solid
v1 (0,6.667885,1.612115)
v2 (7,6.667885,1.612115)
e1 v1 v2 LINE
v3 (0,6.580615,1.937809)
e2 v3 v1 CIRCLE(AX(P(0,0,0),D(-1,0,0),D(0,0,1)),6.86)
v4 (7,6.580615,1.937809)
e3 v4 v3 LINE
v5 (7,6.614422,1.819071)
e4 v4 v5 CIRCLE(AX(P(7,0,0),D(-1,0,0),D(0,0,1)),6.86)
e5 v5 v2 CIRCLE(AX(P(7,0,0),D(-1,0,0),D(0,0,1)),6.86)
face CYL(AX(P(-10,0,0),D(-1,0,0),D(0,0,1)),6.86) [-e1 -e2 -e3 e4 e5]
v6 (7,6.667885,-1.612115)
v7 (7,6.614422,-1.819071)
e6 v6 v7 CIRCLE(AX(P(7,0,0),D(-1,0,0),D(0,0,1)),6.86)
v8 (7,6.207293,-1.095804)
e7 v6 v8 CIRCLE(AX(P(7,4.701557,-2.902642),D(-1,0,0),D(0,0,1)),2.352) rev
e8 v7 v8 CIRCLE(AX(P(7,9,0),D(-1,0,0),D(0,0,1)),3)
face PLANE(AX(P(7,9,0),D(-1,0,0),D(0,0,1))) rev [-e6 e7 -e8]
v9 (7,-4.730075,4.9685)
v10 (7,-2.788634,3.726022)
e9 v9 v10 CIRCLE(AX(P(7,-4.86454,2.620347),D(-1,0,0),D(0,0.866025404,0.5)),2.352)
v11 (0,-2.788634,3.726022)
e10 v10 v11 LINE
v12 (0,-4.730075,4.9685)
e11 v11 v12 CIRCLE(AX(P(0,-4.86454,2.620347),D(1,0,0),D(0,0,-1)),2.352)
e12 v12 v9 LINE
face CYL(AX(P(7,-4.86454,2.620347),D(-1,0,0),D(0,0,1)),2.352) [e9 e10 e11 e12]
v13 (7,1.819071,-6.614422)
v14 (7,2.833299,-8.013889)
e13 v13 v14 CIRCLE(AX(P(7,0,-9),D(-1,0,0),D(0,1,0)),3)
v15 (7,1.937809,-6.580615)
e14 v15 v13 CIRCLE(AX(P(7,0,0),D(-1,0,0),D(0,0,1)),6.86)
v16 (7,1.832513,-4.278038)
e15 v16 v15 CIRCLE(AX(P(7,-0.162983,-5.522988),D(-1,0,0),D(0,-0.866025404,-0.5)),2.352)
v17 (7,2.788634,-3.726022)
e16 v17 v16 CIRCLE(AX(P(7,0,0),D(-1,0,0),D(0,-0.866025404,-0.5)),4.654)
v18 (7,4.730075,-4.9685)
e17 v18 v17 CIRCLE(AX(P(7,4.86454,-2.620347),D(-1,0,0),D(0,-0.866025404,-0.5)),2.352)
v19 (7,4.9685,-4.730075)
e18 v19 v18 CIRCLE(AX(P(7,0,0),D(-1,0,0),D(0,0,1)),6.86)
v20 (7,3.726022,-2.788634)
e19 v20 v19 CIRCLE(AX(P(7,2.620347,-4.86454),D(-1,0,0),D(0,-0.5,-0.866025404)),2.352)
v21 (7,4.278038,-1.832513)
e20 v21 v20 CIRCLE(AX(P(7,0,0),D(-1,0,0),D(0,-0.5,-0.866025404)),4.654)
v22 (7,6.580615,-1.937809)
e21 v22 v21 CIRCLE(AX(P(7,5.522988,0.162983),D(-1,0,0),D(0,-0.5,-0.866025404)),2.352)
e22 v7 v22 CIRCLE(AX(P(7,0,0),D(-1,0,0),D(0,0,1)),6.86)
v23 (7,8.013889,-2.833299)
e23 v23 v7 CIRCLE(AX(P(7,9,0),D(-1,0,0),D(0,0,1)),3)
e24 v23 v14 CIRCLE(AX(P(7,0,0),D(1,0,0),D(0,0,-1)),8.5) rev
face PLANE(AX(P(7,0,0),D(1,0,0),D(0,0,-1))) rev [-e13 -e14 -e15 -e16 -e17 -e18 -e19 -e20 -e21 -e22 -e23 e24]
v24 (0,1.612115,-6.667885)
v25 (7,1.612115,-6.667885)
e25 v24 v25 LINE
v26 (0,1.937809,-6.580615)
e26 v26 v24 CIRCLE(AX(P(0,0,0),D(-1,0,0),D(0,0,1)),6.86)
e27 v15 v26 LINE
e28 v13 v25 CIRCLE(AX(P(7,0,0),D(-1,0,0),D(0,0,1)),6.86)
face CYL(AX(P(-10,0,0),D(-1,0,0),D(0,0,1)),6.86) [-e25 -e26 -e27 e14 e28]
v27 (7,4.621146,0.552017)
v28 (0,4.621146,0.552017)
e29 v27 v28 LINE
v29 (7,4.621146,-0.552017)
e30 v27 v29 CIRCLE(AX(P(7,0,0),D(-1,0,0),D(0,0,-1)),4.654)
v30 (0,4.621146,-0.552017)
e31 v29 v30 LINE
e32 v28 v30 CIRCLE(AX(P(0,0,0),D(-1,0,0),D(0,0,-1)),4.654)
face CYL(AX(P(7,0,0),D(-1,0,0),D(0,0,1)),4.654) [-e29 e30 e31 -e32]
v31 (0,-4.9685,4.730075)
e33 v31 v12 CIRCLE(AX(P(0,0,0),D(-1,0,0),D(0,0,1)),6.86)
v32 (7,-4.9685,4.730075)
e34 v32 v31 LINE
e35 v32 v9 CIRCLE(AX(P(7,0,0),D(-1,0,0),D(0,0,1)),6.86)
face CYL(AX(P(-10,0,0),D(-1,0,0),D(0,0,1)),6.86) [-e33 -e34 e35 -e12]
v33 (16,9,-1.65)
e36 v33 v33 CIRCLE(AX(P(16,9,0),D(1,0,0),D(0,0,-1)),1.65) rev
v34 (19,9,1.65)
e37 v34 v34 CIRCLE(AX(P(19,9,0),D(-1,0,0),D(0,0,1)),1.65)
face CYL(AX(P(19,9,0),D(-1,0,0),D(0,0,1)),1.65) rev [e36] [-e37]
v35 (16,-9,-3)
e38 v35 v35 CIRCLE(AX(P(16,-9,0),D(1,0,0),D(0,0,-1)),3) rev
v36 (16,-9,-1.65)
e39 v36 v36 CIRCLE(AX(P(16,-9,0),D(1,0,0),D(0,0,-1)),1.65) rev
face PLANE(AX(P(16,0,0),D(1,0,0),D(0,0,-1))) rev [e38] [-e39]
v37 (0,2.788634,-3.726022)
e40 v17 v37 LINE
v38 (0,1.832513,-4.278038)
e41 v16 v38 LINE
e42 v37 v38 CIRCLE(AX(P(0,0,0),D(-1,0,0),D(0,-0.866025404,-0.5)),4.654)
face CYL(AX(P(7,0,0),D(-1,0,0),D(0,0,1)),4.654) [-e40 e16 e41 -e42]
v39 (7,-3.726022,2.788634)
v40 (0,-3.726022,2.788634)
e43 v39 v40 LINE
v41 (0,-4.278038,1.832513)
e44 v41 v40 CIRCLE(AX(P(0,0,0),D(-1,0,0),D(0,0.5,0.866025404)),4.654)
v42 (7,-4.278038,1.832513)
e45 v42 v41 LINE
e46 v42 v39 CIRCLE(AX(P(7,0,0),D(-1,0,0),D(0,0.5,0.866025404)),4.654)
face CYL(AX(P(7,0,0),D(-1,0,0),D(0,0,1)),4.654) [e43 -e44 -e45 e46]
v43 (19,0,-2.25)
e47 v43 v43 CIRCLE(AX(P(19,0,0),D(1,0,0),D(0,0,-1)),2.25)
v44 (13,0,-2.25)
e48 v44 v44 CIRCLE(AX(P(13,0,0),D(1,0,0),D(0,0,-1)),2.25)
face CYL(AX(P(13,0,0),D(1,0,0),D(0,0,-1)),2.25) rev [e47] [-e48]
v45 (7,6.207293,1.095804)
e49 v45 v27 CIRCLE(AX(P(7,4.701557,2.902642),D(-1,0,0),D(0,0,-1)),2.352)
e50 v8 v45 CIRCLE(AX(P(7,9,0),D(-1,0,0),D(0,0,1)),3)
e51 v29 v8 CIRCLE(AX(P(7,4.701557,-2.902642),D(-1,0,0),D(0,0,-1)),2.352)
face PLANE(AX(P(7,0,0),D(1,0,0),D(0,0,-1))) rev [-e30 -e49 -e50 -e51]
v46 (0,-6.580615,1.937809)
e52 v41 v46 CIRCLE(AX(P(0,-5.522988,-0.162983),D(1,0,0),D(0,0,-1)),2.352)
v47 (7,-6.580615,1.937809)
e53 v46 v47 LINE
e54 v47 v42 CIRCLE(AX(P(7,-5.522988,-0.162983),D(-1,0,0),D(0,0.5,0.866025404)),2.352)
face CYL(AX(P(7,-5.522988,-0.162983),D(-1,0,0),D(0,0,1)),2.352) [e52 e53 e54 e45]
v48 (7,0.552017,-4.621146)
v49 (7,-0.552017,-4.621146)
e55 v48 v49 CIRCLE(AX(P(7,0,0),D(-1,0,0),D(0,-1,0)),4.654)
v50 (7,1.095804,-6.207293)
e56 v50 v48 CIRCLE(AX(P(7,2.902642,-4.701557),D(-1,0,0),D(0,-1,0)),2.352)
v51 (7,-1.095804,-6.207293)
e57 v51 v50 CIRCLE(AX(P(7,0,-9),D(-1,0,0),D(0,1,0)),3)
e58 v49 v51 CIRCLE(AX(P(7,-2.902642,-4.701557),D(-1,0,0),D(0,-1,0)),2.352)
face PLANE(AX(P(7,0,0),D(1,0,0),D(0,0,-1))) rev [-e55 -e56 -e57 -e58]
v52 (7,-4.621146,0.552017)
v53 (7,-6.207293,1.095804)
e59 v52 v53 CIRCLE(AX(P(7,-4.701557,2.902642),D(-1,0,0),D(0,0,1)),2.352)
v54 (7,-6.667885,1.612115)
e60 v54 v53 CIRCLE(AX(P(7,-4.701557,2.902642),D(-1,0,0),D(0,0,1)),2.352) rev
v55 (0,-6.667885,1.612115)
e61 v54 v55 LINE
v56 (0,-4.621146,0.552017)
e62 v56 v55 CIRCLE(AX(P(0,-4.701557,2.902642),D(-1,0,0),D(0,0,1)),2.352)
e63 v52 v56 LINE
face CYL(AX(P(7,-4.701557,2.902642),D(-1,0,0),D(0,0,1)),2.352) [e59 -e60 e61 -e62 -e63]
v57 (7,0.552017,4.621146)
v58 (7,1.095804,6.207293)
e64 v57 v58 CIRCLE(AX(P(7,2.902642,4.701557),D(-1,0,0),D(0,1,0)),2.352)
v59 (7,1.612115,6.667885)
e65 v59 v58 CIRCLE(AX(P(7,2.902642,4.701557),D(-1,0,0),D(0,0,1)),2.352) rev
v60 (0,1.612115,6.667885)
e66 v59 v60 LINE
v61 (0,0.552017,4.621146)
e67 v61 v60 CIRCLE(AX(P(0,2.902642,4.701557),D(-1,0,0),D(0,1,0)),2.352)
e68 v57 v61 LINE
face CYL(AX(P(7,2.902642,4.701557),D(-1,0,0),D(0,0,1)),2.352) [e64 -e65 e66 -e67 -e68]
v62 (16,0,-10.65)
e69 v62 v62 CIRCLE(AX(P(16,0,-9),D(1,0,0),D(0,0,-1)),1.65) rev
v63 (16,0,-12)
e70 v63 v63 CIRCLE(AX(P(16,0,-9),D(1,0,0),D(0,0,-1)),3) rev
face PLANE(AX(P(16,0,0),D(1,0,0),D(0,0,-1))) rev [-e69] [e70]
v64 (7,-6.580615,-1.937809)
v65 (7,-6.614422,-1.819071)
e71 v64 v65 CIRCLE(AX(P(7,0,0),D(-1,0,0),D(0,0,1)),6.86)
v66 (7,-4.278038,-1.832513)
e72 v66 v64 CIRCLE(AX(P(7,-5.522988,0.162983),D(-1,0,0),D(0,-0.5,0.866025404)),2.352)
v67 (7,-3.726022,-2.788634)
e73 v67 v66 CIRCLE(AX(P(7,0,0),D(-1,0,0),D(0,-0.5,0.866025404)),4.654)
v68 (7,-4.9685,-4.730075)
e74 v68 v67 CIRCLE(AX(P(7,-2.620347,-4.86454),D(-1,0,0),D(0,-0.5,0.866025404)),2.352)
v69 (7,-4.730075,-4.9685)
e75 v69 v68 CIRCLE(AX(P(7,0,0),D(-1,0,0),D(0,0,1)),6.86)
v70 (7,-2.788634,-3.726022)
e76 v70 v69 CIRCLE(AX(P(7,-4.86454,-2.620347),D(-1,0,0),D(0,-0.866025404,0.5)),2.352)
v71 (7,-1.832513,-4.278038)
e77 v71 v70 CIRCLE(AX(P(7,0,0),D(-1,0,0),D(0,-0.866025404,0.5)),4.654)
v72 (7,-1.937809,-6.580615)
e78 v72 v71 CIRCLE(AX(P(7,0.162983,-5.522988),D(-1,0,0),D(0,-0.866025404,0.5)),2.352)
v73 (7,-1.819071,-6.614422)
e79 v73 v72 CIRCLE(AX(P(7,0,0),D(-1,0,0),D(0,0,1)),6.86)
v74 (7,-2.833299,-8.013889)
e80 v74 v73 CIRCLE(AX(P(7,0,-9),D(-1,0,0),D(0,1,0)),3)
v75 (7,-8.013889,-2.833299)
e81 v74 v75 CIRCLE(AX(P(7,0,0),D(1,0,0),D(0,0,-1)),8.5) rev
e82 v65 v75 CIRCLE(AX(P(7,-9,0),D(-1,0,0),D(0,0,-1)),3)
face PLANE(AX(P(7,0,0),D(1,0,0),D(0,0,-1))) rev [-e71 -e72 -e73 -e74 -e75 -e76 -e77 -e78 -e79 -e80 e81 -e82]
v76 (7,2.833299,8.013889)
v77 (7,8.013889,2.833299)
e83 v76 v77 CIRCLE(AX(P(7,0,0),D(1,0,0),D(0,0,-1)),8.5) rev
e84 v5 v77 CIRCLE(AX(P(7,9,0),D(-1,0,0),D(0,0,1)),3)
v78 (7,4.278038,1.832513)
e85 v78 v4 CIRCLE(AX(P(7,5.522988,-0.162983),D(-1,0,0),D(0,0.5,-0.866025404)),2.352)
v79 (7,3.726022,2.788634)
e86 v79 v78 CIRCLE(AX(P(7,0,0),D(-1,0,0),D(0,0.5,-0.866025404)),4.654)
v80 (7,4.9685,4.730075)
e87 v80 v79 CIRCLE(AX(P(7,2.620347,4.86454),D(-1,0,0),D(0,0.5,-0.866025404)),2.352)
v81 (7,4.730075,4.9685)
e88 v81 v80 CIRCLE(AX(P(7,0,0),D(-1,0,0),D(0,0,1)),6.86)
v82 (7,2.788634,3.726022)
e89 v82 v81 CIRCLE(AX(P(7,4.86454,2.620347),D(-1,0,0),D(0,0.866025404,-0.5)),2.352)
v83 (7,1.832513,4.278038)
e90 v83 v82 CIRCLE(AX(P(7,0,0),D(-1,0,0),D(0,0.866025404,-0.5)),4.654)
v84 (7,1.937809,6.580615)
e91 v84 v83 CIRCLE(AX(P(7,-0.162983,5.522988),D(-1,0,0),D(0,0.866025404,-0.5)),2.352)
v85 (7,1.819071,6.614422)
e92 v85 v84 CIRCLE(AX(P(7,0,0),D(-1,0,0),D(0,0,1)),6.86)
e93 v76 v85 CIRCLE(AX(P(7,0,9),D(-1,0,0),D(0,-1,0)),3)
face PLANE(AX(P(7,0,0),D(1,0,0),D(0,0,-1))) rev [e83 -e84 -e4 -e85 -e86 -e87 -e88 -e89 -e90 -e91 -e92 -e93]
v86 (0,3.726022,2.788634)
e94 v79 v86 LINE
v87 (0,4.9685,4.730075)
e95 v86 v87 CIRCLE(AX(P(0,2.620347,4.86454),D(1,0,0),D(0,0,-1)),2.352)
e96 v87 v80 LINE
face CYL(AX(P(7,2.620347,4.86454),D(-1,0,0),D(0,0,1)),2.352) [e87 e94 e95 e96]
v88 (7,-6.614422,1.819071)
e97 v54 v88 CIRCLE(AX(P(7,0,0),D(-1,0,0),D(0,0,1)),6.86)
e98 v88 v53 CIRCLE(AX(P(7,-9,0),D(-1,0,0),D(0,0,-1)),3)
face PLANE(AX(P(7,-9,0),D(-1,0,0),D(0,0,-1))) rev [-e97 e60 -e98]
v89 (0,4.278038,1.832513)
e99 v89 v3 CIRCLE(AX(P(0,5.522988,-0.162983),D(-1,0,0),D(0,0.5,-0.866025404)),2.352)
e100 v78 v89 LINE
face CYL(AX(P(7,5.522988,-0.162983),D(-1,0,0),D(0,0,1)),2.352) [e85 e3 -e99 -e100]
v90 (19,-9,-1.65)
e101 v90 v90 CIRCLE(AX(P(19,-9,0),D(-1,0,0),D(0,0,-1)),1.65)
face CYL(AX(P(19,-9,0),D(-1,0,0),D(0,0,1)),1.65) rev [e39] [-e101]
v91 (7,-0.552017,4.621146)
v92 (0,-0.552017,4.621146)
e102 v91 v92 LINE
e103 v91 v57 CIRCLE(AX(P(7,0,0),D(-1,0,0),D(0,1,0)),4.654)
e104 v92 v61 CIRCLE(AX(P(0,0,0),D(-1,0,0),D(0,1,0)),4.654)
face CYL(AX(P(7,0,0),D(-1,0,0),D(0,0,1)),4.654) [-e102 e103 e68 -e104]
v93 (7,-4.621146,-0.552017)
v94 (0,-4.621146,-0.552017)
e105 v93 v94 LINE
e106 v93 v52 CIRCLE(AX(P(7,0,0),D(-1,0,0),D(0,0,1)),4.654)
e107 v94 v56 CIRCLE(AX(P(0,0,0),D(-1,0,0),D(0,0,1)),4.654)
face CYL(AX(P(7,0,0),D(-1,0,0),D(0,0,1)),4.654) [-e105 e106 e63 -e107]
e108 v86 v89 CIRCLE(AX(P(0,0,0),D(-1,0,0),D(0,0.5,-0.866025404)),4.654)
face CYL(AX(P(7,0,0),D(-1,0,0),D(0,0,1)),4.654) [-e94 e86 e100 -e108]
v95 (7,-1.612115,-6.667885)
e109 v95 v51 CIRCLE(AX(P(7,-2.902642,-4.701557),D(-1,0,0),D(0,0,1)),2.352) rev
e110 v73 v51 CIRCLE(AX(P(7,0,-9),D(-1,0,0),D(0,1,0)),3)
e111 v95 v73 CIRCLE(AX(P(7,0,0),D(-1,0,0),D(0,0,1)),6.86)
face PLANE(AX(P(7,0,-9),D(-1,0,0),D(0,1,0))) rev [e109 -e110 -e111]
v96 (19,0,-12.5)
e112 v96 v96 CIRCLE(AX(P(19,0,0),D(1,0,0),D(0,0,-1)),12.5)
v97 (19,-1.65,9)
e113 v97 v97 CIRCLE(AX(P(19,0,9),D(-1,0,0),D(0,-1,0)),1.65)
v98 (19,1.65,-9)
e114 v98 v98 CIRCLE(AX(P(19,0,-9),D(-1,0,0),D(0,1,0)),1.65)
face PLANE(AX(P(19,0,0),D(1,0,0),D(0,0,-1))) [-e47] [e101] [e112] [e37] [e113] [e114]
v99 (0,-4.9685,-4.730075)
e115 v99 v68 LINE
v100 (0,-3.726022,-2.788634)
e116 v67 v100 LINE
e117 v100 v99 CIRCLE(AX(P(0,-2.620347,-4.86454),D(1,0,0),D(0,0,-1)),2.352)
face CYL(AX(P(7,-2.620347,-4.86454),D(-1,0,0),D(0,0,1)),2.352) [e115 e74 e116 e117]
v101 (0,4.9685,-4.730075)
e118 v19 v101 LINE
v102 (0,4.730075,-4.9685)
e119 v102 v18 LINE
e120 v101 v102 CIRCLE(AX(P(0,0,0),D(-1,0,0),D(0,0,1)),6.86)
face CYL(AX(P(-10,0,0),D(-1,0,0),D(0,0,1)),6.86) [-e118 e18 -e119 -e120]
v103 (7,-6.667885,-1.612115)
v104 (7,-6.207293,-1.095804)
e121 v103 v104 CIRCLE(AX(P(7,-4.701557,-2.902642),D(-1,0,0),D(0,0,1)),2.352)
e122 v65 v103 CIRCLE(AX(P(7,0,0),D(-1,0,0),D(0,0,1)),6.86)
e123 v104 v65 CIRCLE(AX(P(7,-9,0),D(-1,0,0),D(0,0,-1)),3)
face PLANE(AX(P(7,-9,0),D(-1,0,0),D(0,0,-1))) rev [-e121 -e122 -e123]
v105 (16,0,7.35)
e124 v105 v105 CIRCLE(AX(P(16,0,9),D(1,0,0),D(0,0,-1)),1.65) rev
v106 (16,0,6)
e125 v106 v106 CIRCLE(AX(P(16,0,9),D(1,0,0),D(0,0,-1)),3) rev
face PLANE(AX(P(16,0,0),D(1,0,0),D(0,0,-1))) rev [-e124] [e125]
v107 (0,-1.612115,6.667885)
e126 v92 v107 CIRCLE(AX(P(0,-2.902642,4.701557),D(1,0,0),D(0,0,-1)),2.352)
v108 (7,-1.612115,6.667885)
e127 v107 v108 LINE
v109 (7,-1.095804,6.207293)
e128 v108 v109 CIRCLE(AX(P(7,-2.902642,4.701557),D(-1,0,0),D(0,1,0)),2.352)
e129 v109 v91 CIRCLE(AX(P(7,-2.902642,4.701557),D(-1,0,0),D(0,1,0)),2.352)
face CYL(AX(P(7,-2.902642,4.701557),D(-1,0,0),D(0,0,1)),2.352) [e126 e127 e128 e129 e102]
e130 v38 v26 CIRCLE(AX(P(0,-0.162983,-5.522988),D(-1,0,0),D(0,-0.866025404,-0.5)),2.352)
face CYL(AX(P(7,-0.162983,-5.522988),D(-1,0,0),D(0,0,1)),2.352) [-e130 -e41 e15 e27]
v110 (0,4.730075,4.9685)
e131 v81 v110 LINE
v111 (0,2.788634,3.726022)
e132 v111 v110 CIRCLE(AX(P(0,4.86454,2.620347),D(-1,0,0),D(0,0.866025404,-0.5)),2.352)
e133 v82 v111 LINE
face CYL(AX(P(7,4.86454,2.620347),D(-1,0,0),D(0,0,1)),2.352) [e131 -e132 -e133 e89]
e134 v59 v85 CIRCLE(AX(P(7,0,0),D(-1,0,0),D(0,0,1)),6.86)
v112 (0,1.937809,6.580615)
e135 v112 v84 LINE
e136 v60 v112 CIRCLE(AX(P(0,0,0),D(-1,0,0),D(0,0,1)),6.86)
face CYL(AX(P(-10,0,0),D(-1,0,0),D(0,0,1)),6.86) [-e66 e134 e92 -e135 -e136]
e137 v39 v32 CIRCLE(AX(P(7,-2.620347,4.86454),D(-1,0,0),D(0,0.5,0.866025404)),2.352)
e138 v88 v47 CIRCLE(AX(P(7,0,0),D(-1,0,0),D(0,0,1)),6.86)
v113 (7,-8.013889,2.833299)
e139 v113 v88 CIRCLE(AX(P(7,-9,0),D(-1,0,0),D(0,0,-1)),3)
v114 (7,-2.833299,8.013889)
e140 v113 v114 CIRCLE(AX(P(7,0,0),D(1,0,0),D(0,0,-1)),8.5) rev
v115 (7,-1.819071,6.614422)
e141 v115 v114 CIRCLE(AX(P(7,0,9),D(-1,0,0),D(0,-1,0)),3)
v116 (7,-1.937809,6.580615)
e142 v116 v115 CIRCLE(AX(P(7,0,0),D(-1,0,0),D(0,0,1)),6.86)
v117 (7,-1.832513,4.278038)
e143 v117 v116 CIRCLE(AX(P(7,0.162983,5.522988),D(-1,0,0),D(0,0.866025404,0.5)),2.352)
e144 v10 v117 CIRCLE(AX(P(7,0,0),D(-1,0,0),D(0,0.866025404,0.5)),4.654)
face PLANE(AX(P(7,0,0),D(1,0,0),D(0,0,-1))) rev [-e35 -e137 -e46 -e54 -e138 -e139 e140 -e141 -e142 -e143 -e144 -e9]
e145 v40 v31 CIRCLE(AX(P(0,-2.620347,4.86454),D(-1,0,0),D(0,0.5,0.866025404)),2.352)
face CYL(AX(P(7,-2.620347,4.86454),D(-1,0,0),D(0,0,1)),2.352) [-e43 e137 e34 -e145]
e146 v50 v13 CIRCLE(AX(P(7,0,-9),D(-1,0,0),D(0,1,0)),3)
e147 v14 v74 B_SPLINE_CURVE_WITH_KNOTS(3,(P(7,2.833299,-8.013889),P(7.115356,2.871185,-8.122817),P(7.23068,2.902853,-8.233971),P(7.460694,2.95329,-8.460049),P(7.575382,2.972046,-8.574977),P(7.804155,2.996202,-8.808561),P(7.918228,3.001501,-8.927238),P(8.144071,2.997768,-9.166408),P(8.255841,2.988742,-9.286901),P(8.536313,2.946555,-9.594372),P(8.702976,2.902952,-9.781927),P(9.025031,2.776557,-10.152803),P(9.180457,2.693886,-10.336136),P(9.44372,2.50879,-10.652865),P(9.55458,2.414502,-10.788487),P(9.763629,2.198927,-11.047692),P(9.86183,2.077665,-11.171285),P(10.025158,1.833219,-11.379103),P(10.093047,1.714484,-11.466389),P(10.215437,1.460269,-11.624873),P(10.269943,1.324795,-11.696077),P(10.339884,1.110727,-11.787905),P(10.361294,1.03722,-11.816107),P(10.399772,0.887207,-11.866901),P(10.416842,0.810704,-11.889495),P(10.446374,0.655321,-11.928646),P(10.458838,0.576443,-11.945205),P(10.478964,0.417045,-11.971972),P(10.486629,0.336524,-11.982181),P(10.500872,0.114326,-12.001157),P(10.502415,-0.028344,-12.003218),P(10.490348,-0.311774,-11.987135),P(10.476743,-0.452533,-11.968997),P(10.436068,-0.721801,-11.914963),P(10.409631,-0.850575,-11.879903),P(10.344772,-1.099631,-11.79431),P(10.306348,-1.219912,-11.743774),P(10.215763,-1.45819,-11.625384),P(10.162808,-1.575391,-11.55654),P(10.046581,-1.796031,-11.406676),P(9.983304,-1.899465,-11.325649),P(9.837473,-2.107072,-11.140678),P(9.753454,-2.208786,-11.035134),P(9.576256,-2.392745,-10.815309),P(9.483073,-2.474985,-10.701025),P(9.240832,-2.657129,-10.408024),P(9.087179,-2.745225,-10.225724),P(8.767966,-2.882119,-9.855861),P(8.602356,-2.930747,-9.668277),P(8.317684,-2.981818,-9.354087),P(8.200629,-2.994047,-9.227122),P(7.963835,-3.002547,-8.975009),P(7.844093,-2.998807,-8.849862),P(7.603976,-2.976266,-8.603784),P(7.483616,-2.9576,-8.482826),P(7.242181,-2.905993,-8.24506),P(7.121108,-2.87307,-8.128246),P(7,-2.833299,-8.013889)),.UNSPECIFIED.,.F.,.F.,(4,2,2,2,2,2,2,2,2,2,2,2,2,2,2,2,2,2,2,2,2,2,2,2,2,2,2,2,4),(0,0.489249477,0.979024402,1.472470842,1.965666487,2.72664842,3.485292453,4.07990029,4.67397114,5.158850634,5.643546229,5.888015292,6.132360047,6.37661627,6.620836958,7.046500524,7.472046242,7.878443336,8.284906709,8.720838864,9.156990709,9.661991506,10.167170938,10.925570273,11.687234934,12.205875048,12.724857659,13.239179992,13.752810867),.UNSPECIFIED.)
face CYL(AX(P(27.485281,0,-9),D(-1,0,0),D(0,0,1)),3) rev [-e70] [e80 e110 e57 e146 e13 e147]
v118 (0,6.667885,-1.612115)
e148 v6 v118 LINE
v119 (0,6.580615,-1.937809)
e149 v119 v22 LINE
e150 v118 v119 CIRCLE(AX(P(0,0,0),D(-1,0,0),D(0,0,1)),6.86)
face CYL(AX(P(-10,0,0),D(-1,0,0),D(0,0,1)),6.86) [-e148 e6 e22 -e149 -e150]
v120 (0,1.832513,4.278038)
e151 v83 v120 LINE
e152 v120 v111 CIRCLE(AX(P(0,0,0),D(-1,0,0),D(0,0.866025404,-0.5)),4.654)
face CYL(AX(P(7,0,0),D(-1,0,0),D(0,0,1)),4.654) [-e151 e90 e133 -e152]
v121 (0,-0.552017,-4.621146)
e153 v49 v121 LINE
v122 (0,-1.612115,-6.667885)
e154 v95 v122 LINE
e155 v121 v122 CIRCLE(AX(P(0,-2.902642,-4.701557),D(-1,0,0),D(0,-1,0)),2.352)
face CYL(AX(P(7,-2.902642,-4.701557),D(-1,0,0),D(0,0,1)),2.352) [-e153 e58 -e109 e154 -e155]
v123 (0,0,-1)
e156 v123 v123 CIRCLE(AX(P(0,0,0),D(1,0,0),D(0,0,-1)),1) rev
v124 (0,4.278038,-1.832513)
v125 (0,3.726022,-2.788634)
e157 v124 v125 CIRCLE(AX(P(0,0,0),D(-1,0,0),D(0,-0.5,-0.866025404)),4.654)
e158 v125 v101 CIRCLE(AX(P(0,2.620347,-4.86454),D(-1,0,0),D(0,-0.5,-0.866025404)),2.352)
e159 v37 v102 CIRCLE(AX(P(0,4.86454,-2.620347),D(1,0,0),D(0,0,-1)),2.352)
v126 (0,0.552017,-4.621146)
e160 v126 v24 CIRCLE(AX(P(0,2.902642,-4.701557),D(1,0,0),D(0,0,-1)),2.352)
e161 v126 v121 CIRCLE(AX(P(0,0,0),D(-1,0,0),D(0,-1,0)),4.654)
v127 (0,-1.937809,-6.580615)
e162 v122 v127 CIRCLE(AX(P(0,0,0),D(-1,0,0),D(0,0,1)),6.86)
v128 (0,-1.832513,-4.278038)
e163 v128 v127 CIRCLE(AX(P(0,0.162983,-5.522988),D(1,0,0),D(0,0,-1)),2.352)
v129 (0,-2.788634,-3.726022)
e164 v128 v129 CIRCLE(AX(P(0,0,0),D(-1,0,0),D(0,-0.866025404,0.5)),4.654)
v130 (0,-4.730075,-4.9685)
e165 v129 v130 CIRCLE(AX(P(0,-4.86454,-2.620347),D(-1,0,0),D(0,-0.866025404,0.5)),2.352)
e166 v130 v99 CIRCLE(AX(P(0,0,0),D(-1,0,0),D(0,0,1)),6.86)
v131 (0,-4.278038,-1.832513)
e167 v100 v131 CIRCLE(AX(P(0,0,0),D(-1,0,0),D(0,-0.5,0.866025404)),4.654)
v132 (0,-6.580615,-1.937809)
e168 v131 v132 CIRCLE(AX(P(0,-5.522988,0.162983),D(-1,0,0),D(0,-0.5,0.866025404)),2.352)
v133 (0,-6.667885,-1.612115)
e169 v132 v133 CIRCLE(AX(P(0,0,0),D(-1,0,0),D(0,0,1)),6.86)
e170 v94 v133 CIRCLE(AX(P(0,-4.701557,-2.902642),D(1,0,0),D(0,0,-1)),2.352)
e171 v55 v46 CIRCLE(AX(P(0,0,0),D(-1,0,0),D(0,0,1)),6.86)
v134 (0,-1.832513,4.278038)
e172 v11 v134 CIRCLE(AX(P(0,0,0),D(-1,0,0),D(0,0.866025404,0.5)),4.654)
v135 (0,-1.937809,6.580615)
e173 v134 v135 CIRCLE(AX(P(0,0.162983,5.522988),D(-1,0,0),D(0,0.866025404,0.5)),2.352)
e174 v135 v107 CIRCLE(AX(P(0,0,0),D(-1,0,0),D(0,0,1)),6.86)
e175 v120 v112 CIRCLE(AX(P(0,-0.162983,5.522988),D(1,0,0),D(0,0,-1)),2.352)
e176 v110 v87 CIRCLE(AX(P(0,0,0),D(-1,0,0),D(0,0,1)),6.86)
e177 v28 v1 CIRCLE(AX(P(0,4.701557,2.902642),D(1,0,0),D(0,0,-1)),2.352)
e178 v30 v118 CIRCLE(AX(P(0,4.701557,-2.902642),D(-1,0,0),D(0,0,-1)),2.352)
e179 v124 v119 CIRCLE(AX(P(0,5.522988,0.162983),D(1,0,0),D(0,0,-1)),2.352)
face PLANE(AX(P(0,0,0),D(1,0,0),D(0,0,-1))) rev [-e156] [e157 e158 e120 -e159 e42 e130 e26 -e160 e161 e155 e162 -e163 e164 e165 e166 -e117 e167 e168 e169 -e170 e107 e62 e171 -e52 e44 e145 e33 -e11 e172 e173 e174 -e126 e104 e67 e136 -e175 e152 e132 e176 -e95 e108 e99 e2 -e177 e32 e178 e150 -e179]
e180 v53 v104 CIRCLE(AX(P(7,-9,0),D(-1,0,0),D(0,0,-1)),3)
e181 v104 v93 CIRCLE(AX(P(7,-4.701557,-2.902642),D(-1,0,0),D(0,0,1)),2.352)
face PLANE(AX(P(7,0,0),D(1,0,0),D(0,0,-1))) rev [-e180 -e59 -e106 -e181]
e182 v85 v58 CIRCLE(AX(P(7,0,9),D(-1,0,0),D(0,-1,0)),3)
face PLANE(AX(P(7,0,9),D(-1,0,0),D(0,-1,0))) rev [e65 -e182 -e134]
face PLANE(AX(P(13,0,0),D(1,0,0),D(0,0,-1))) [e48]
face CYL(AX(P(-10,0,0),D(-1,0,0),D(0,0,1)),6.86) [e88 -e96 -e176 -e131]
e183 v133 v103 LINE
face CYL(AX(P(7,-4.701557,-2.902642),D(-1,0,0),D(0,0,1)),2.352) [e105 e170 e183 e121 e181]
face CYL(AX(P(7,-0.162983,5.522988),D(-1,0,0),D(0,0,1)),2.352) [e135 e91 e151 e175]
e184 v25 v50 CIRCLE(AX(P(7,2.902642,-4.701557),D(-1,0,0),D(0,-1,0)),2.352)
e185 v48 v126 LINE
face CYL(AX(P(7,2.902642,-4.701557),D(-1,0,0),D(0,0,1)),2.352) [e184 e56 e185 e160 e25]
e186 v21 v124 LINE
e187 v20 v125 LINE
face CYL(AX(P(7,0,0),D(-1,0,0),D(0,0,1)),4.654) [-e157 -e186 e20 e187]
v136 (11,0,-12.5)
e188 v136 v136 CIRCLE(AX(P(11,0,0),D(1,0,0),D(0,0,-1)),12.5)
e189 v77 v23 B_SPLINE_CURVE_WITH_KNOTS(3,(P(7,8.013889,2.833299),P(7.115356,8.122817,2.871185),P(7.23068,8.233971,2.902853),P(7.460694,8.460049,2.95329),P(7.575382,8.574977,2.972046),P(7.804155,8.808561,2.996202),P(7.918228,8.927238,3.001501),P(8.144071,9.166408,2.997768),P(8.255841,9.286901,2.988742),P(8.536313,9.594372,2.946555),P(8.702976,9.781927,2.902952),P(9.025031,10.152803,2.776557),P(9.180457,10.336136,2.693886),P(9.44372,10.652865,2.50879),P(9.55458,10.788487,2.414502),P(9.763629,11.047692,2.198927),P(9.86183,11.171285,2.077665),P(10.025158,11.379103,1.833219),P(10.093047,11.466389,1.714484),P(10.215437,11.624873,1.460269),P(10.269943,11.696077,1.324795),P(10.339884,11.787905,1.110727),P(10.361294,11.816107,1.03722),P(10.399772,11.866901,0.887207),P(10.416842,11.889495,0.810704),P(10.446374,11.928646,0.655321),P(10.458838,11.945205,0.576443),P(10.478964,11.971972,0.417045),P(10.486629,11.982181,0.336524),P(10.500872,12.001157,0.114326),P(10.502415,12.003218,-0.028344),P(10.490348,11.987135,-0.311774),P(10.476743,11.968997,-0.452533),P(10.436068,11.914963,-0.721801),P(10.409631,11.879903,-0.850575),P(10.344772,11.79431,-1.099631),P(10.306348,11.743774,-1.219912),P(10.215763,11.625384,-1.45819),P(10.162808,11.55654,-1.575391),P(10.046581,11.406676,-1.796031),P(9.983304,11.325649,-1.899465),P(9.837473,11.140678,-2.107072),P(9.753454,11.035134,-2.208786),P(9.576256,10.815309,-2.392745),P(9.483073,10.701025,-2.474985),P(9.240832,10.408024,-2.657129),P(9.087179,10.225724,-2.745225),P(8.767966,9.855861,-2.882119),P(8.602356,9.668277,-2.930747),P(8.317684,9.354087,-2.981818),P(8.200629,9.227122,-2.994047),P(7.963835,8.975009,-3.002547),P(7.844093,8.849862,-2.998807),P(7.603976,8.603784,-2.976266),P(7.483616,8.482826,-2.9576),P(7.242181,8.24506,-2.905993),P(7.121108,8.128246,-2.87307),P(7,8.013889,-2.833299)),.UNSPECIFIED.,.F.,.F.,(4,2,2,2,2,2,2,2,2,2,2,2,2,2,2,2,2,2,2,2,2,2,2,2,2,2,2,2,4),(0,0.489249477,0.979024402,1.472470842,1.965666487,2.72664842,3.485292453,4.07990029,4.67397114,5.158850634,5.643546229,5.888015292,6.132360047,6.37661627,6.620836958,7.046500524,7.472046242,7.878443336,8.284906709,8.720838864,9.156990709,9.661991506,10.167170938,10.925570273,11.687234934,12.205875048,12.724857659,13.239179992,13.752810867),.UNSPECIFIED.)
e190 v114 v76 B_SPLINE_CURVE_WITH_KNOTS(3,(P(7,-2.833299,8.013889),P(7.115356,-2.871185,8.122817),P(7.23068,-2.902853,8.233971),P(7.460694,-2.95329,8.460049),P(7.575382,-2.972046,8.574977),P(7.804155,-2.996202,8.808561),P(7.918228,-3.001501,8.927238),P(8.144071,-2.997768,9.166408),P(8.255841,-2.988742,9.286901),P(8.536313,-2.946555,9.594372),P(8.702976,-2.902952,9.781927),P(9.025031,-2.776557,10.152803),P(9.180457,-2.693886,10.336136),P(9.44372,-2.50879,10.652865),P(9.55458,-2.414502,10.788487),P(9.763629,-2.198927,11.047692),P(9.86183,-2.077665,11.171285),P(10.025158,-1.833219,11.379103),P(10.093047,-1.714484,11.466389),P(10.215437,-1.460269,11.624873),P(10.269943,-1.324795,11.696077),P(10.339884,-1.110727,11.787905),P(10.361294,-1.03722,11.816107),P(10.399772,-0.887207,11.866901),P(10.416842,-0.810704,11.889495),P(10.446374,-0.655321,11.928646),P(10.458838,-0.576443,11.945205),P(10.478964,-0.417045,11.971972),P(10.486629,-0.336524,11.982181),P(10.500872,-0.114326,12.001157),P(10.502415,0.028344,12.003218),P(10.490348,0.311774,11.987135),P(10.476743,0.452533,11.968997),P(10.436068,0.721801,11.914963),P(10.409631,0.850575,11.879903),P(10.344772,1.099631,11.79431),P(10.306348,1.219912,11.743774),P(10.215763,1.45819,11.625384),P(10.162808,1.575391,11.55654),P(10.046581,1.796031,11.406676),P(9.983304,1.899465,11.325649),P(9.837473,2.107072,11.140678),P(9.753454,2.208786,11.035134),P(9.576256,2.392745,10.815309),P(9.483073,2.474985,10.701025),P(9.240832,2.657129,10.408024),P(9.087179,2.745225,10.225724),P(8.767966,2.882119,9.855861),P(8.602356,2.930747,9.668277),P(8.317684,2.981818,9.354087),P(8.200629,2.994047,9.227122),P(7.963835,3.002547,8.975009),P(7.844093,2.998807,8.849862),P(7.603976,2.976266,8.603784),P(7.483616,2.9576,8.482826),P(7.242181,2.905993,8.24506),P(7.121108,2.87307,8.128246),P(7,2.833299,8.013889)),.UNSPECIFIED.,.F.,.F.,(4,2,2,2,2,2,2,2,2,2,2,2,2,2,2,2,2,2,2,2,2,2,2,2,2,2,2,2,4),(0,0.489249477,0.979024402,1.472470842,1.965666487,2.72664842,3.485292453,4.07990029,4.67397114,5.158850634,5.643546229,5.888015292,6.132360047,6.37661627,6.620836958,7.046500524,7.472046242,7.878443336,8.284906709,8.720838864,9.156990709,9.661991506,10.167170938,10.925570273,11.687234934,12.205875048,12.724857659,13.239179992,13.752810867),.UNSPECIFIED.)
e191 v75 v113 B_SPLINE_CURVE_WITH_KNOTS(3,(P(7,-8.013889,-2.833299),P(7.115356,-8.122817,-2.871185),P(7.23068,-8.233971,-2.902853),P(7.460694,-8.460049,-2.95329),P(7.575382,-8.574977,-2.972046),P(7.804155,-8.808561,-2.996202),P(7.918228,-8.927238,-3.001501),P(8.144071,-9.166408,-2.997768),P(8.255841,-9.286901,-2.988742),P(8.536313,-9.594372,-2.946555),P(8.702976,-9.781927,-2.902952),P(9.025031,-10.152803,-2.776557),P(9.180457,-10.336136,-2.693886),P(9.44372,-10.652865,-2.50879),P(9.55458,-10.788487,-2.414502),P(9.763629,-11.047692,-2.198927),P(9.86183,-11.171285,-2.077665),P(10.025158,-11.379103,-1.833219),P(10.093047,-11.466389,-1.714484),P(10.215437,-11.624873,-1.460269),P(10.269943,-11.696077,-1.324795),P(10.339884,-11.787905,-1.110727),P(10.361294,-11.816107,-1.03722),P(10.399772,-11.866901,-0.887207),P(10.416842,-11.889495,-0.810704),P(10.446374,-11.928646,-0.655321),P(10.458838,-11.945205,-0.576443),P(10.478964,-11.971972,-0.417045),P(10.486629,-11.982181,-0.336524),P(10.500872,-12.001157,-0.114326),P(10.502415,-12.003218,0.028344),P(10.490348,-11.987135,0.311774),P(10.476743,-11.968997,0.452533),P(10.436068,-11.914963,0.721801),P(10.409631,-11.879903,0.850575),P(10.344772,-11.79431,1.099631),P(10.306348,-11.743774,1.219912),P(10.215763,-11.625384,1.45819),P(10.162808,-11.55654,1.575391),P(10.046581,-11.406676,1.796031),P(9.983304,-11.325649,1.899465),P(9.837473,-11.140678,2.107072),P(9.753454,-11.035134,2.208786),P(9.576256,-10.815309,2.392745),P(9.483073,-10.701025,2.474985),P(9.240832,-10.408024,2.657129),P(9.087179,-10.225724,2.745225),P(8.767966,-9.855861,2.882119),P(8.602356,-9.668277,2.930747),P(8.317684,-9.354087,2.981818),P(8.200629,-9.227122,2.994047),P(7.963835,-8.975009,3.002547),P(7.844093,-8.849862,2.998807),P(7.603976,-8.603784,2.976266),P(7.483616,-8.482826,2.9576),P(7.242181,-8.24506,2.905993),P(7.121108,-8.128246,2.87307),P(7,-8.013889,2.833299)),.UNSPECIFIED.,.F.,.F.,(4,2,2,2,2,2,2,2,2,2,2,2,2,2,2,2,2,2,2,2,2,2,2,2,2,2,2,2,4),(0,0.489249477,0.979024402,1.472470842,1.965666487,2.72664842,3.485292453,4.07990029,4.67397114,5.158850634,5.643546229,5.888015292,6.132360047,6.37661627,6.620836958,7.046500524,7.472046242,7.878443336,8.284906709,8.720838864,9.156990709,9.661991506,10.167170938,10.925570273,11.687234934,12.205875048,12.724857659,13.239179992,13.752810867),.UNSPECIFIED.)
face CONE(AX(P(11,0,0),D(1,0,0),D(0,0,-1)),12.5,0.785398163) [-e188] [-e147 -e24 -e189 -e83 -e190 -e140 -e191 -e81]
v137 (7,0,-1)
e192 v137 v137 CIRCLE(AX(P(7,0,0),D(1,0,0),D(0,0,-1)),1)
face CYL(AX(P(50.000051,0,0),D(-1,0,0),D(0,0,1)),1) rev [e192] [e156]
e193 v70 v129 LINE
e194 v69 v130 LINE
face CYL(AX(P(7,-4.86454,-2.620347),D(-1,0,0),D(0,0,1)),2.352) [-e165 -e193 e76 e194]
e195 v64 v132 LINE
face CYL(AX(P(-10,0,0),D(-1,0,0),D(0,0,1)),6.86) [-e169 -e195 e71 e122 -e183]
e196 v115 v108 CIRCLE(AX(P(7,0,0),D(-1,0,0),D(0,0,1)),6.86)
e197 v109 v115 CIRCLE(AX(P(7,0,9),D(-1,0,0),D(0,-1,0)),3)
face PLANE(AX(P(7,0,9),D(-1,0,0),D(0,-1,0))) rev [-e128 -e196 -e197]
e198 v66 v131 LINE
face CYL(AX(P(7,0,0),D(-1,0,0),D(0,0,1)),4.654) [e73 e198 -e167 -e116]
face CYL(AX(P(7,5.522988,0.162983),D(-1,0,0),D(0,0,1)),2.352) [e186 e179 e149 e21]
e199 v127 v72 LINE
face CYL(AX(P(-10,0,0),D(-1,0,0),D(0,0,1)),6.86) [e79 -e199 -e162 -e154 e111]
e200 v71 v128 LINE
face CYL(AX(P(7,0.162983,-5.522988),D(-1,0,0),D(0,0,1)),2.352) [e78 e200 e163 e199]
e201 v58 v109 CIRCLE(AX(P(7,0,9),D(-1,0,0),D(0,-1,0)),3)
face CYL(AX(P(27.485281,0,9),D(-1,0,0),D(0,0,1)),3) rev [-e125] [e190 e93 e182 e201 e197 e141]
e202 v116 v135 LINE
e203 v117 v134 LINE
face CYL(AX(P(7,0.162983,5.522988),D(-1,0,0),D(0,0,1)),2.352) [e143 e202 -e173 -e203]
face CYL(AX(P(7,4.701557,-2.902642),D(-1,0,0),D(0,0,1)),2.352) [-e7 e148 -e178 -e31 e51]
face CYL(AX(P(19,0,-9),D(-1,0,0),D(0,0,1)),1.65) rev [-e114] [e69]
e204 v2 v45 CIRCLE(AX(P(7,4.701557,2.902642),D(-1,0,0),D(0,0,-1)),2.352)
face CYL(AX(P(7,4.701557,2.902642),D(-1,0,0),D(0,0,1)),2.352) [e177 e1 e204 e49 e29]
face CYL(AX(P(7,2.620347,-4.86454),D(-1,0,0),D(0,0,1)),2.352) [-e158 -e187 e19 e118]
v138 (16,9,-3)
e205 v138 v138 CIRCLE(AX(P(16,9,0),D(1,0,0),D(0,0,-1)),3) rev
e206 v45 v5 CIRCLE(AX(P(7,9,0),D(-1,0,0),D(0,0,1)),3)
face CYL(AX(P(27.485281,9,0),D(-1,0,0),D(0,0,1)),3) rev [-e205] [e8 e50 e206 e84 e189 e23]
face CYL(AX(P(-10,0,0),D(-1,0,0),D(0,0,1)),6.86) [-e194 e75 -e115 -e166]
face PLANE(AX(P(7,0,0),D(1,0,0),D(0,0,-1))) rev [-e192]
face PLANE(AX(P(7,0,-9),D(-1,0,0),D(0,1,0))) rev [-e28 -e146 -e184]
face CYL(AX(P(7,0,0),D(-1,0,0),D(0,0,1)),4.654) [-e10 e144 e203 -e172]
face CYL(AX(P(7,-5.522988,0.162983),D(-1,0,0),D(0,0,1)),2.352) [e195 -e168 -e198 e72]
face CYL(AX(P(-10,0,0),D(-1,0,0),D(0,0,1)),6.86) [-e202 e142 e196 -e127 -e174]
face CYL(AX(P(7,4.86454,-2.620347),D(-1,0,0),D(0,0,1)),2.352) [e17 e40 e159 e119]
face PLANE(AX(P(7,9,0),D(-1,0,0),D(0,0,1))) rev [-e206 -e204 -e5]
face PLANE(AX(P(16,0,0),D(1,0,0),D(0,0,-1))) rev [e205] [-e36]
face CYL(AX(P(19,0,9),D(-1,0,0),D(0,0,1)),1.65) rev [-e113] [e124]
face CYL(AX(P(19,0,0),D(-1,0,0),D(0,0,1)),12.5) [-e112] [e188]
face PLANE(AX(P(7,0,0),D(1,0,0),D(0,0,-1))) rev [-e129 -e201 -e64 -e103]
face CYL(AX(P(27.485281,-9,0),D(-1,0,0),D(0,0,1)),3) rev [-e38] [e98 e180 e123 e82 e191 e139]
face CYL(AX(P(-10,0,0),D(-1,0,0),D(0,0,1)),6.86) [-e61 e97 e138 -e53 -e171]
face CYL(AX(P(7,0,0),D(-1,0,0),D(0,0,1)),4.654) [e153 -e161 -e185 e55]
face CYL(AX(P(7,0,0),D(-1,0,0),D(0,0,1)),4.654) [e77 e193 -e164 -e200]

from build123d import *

# Parameters (mm, degrees)
BASPROSKE_W         = 7
BASPROSKE_H         = 6.86
TOOTHCUT_DEPTH      = 12.963243707
TEETHCUTS_COUNT     = 12
TEETHCUTS_ANGLE     = 330
BORSKE_R            = 1
BORE_DEPTH          = 50.0000508
SKETCH1_R           = 12.5
BOSS_EXTRUDE1_DEPTH = 12
SKETCH2_R           = 1.65
CUT_EXTRUDE1_DEPTH  = 22.365860619
SKETCH3_R           = 3
CUT_EXTRUDE2_DEPTH  = 9
CIRPATTERN1_COUNT   = 4
CHAMFER1_SIZE       = 4
SKETCH4_R           = 2.25
CUT_EXTRUDE3_DEPTH  = 6


with BuildPart() as part:
    # BasProSke → Base-Revolve (revolve)
    with BuildSketch(Plane(origin=(0, 0, 0), x_dir=(1, 0, 0), z_dir=(0, 1, 0)), mode=Mode.PRIVATE) as base_revolve_sk:
        with Locations((3.5, 3.43)):
            Rectangle(BASPROSKE_W, BASPROSKE_H)
    revolve(base_revolve_sk.sketch.rotate(Axis((-10, 0, 0), (1, 0, 0)), 180), axis=Axis((-10, 0, 0), (1, 0, 0)))

    # TooCutSke → ToothCut (cut, through all)
    with BuildSketch(Plane(origin=(0, 0, 0), x_dir=(0, 0, -1), z_dir=(1, 0, 0))):
        with BuildLine():
            ThreePointArc((0.552016647, 4.621146354), (0, 4.654), (-0.552016647, 4.621146354))
            ThreePointArc((-0.552016647, 4.621146354), (-0.822258441, 5.798784691), (-1.641510828, 6.686865885))
            ThreePointArc((-1.641510828, 6.686865885), (0, 6.8854), (1.641510828, 6.686865885))
            ThreePointArc((1.641510828, 6.686865885), (0.822258441, 5.798784691), (0.552016647, 4.621146354))
        make_face()
    toothcut = extrude(amount=TOOTHCUT_DEPTH, mode=Mode.SUBTRACT)

    # TeethCuts: ToothCut ×12 about axis
    teethcuts_axis = Axis((-10, 0, 0), (1, 0, 0))
    for i in range(1, TEETHCUTS_COUNT):
        add(toothcut.rotate(teethcuts_axis, i * TEETHCUTS_ANGLE / (TEETHCUTS_COUNT - 1)), mode=Mode.SUBTRACT)

    # BorSke → Bore (cut, symmetric)
    with BuildSketch(Plane(origin=(0, 0, 0), x_dir=(0, 0, -1), z_dir=(1, 0, 0))):
        with Locations(Location((0, 0, 0), (0, 0, 180))):
            Circle(BORSKE_R)
    extrude(amount=BORE_DEPTH, both=True, mode=Mode.SUBTRACT)

    # Sketch1 → Boss-Extrude1 (add)
    with BuildSketch(Plane(origin=(7, 0, 0), x_dir=(0, 0, -1), z_dir=(1, 0, 0))):
        Circle(SKETCH1_R)
    extrude(amount=BOSS_EXTRUDE1_DEPTH)

    # Sketch2 → Cut-Extrude1 (cut, through all)
    with BuildSketch(Plane.ZY.offset(-7)):
        with Locations((0, 9)):
            Circle(SKETCH2_R)
    cut_extrude1 = extrude(amount=-CUT_EXTRUDE1_DEPTH, mode=Mode.SUBTRACT)

    # Sketch3 → Cut-Extrude2 (cut)
    with BuildSketch(Plane.ZY.offset(-7)):
        with Locations(Location((0, 9, 0), (0, 0, 307.326549715))):
            Circle(SKETCH3_R)
    cut_extrude2 = extrude(amount=-CUT_EXTRUDE2_DEPTH, mode=Mode.SUBTRACT)

    # CirPattern1: Cut-Extrude1, Cut-Extrude2 ×4 about axis
    cirpattern1_axis = Axis((0, 0, 0), (1, 0, 0))
    add([cut_extrude1.rotate(cirpattern1_axis, i * 360 / CIRPATTERN1_COUNT) for i in range(1, CIRPATTERN1_COUNT)], mode=Mode.SUBTRACT)
    add([cut_extrude2.rotate(cirpattern1_axis, i * 360 / CIRPATTERN1_COUNT) for i in range(1, CIRPATTERN1_COUNT)], mode=Mode.SUBTRACT)

    # Chamfer1
    # the kernel refuses this chamfer: 4 mm, written as the material it takes off along each edge
    with BuildSketch(Plane(origin=(7, 0, 0), x_dir=(0, 0, -1), z_dir=(0, -1, 0))) as chamfer1_piece_1:
        Polygon((12.5, CHAMFER1_SIZE), (12.5 - CHAMFER1_SIZE, 0), (12.5, 0), align=None)
    revolve(axis=Axis((7, 0, 0), (1, 0, 0)), mode=Mode.SUBTRACT)

    # Sketch4 → Cut-Extrude3 (cut)
    with BuildSketch(Plane(origin=(19, 0, 0), x_dir=(0, 0, -1), z_dir=(1, 0, 0))):
        Circle(SKETCH4_R)
    extrude(amount=-CUT_EXTRUDE3_DEPTH, mode=Mode.SUBTRACT)


solid = part.part
